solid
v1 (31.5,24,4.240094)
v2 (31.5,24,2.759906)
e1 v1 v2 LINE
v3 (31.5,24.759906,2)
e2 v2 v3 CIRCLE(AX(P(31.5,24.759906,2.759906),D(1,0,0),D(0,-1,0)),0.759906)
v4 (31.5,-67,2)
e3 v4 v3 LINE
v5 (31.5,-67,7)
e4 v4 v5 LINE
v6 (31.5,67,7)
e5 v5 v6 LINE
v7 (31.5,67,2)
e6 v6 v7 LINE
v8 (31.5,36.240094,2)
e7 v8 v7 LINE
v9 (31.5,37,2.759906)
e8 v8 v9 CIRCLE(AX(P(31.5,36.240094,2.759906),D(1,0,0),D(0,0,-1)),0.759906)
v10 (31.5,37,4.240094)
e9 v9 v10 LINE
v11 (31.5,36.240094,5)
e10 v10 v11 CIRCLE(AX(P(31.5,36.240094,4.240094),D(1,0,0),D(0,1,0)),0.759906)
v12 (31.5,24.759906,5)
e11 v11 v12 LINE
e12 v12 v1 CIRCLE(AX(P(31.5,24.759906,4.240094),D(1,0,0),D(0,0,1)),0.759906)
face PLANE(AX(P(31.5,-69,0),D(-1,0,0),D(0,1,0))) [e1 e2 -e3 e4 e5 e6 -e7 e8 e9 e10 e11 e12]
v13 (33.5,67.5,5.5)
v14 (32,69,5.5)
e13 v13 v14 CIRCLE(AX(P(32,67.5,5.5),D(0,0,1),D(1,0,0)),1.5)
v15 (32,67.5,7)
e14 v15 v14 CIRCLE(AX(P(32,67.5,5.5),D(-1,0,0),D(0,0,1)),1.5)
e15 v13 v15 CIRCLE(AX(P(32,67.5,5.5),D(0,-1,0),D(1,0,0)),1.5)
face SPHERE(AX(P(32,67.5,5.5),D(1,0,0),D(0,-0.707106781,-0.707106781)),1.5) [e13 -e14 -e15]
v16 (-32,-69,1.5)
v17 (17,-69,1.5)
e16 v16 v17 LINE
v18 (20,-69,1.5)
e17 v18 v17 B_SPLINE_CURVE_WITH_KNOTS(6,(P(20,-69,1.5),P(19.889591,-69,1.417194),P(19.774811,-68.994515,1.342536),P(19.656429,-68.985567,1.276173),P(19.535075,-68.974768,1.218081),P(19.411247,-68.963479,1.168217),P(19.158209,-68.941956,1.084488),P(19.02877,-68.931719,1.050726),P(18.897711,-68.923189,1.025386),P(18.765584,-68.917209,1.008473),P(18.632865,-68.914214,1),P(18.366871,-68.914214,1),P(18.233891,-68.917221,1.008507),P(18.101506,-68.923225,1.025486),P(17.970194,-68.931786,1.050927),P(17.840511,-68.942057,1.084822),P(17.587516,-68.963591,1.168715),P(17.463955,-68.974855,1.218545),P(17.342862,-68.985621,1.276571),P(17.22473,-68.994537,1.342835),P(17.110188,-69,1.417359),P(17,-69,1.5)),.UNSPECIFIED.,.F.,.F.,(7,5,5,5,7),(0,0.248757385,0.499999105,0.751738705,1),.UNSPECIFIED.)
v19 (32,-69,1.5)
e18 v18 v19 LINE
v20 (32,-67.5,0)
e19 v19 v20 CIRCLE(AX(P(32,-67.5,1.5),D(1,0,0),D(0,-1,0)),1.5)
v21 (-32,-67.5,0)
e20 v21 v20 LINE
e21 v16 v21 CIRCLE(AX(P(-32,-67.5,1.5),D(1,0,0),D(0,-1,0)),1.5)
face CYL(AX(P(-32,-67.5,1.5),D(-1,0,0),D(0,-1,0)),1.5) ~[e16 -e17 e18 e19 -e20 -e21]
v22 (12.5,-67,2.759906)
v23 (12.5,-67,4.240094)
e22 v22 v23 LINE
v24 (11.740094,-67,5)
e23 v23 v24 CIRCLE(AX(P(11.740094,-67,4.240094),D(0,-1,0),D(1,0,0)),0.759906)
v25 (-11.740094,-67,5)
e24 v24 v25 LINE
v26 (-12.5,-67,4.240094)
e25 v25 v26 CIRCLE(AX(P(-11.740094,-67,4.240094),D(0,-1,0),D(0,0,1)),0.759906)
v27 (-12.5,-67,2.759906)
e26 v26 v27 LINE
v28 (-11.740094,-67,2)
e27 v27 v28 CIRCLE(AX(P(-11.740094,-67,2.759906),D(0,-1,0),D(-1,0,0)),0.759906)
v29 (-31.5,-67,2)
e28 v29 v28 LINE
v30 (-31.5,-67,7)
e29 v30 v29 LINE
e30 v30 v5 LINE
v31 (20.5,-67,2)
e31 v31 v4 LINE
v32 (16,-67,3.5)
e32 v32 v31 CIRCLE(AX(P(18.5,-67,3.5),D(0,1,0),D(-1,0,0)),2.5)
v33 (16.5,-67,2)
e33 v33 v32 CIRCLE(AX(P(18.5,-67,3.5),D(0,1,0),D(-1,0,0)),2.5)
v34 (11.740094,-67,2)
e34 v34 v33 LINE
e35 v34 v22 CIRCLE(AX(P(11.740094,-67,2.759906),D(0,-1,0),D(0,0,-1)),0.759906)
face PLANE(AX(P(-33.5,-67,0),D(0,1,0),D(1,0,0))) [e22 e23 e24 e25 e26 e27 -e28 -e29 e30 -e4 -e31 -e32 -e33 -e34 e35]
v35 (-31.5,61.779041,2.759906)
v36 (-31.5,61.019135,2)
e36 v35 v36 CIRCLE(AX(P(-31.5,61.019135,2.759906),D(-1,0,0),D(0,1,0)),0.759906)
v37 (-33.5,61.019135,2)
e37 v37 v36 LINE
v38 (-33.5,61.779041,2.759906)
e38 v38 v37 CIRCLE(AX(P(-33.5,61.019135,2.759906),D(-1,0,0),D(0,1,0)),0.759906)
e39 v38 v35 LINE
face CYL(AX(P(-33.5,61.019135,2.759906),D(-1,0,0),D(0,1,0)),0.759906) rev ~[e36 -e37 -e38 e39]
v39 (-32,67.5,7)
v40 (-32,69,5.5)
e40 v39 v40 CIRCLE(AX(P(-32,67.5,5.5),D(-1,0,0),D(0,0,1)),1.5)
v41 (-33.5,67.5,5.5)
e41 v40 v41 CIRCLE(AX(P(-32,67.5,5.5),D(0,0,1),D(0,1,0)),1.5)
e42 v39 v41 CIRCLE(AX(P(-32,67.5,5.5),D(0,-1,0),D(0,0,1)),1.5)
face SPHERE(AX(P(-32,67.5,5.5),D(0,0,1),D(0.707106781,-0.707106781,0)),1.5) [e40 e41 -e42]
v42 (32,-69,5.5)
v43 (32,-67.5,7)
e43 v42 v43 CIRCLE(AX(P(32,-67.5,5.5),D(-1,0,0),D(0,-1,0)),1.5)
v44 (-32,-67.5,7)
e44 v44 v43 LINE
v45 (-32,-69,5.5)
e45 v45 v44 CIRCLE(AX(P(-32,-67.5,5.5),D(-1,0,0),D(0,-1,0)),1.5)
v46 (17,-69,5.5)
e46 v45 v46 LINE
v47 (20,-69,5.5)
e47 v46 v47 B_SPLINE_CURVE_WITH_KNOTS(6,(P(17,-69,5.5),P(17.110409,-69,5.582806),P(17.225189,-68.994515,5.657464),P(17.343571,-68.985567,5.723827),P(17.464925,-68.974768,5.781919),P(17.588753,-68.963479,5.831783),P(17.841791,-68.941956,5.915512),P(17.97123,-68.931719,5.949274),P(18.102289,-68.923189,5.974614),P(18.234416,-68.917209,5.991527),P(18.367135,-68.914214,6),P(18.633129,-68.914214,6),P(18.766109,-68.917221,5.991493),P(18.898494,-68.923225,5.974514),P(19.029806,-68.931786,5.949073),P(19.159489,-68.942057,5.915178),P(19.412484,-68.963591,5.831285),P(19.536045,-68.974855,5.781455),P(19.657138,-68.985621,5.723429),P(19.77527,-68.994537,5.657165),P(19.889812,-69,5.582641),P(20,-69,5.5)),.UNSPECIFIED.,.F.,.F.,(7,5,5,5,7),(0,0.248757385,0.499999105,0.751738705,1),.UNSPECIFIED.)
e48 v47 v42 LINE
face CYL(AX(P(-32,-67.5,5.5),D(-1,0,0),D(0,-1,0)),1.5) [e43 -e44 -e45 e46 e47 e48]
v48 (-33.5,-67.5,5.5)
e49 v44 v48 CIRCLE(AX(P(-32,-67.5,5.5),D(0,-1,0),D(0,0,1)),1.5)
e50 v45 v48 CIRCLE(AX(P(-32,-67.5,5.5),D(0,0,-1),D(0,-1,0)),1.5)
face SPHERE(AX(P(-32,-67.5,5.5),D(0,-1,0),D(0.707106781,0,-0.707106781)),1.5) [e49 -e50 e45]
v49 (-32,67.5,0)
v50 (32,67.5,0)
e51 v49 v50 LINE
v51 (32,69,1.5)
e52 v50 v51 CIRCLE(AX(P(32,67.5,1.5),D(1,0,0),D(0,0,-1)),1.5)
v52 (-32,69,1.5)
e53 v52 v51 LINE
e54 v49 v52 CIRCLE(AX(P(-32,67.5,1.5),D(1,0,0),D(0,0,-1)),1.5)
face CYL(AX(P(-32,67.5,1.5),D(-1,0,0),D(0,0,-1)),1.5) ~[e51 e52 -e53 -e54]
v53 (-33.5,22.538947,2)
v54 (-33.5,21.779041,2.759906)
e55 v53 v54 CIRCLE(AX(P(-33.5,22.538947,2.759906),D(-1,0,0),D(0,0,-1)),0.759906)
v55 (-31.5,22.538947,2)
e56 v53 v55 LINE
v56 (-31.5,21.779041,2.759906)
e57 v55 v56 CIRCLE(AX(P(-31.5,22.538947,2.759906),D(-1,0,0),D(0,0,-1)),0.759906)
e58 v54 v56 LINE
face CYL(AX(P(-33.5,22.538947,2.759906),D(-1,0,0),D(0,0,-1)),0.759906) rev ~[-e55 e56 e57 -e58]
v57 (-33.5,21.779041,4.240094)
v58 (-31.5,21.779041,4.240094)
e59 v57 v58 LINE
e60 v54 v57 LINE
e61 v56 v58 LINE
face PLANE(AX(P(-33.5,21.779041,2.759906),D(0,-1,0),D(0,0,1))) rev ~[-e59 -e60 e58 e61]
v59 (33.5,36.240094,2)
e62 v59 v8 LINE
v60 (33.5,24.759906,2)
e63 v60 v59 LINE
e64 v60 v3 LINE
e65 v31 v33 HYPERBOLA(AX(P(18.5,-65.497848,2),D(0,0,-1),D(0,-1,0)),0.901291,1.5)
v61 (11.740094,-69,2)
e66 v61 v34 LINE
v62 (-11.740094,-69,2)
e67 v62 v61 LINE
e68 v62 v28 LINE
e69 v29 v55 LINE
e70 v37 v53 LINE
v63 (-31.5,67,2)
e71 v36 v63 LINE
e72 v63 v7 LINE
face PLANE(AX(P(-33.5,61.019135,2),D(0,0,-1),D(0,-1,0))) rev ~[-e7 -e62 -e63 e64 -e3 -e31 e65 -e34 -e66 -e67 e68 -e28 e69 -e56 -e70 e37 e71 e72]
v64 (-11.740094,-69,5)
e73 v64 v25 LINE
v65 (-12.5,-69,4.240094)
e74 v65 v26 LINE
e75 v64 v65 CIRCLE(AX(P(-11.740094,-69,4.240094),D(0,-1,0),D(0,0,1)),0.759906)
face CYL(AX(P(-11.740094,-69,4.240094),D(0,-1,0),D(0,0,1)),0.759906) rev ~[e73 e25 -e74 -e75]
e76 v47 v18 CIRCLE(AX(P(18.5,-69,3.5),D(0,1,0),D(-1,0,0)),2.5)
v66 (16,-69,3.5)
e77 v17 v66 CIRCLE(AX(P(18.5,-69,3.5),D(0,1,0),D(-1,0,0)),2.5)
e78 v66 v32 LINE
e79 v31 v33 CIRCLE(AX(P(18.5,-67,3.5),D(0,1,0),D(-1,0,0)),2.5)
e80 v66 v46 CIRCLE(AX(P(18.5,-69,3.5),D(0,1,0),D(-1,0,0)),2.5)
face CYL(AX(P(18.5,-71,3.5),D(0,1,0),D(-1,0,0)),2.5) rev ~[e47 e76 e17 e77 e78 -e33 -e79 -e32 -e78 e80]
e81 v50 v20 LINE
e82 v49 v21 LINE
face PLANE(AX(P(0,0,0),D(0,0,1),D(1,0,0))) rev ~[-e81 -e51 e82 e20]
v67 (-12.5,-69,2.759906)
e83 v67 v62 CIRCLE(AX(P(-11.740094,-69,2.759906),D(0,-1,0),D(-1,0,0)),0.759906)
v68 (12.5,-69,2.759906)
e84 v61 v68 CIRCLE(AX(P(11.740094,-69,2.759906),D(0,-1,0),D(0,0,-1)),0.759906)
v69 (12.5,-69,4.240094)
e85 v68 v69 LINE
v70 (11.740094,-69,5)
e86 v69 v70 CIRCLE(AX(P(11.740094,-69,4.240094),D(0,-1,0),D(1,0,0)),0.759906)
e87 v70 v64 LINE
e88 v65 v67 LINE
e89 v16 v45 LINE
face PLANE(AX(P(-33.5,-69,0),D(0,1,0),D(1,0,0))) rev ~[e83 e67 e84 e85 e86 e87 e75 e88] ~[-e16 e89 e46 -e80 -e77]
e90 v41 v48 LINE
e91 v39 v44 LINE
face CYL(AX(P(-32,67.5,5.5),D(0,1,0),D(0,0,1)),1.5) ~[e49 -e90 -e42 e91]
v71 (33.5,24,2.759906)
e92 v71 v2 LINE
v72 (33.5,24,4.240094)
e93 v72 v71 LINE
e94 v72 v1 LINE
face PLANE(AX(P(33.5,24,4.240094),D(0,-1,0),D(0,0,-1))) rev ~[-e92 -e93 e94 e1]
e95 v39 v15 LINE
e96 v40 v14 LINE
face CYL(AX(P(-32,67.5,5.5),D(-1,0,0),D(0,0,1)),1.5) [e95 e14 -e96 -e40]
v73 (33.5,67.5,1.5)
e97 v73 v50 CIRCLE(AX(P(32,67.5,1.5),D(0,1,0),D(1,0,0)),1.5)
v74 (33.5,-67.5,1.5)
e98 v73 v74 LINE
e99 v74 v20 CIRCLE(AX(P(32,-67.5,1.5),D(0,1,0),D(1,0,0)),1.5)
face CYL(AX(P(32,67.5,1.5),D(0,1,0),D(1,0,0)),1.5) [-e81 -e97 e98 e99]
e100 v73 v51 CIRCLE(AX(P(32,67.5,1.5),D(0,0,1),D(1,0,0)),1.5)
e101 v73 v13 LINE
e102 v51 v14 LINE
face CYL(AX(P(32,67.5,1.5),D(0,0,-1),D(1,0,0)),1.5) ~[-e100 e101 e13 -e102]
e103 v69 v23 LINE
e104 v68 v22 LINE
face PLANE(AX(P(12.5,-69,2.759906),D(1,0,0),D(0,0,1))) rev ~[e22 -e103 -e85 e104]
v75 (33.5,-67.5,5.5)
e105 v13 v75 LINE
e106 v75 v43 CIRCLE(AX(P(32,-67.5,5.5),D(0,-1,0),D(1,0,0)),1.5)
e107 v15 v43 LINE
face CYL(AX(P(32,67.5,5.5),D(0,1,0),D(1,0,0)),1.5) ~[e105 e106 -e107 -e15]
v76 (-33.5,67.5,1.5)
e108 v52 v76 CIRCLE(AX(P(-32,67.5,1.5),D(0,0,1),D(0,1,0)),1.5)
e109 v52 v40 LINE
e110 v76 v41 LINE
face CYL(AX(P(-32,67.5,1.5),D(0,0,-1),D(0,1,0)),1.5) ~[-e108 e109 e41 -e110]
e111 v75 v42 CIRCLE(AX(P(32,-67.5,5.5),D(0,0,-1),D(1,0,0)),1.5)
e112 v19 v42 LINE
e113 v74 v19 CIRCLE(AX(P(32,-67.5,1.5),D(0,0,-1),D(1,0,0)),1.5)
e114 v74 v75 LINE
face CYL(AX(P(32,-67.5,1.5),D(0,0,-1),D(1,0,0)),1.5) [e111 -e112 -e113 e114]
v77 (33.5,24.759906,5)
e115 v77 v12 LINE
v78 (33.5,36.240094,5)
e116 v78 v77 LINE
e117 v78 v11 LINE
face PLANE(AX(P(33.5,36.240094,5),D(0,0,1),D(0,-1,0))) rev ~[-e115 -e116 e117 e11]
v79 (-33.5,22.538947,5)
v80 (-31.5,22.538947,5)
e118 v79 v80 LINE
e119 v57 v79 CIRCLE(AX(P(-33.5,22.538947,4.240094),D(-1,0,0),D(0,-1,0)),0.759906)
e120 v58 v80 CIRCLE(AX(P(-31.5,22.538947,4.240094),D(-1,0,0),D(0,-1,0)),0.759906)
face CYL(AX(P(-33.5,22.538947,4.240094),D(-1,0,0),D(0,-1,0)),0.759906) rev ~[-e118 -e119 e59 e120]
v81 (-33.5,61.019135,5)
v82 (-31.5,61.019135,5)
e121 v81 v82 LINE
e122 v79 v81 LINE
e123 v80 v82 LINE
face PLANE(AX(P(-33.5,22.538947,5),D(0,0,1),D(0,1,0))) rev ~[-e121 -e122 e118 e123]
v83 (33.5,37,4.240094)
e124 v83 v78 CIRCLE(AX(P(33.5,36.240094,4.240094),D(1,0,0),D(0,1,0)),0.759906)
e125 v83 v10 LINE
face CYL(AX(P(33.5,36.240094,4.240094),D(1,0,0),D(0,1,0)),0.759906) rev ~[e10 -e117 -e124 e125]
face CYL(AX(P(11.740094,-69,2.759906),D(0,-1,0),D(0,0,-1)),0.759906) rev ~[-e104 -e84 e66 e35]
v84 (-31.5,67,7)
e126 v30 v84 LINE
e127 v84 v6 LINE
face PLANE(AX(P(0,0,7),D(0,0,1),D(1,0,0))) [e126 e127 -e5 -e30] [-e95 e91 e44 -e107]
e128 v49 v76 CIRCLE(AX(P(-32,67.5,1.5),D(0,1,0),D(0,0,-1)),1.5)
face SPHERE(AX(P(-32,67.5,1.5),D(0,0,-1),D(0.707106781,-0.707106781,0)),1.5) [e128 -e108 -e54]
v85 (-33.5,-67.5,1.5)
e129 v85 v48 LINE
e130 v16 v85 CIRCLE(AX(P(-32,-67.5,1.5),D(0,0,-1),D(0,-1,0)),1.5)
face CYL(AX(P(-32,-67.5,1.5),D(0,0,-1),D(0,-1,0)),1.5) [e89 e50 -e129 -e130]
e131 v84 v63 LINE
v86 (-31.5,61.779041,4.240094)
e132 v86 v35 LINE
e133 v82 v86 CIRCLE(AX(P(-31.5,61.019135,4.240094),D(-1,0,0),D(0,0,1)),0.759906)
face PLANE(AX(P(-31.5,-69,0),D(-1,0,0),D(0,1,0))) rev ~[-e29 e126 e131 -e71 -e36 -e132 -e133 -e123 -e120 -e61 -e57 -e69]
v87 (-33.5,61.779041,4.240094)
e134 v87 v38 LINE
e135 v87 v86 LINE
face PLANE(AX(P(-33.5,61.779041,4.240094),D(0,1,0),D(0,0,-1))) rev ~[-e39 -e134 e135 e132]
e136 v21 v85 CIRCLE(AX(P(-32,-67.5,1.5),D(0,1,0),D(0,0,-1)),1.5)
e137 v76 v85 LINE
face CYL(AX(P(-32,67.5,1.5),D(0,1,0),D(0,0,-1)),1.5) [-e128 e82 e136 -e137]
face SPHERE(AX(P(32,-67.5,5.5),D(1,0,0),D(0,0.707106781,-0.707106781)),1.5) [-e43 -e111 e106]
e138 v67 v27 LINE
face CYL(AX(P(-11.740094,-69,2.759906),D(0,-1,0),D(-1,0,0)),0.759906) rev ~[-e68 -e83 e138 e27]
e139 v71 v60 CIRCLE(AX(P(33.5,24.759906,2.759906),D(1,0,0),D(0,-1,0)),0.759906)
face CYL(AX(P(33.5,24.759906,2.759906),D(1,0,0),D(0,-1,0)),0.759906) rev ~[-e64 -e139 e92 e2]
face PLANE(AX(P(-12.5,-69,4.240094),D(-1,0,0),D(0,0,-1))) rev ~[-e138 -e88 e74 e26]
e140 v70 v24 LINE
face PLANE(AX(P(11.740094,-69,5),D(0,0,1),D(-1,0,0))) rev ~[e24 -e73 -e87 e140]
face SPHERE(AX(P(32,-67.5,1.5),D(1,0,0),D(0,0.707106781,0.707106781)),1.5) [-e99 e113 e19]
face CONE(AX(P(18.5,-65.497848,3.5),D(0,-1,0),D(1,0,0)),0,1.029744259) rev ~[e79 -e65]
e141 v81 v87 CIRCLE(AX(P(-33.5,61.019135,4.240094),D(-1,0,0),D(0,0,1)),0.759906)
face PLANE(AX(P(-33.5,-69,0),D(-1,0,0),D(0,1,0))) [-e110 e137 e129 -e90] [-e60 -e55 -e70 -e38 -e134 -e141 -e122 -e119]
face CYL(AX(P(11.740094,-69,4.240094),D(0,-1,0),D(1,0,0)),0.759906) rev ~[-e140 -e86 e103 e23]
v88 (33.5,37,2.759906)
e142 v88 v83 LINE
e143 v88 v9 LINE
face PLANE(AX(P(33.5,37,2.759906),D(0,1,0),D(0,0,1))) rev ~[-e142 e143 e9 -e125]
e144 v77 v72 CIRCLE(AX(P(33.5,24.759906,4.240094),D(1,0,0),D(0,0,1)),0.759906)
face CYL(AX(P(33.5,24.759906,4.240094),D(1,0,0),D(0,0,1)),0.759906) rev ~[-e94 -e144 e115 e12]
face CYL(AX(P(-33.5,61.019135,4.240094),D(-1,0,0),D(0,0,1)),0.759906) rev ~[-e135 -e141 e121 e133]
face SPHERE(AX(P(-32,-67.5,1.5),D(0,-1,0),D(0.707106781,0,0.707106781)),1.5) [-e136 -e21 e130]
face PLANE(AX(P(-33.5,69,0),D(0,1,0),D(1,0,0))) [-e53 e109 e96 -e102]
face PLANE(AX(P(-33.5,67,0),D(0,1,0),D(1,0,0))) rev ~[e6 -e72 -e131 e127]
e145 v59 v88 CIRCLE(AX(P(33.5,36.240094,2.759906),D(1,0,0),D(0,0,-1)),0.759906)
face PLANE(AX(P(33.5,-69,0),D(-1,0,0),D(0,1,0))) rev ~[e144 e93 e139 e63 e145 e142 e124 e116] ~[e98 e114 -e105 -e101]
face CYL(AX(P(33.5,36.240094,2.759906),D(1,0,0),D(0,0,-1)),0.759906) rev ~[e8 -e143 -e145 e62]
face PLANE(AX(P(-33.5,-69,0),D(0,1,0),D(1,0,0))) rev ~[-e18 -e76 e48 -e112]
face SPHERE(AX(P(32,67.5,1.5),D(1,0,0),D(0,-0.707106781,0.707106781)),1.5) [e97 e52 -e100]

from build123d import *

# Parameters (mm, degrees)
F0_W          = 67
F0_H          = 138
F1_DEPTH      = 7
F2_T          = -2
F4_DEPTH      = 2
F6_DEPTH      = 2
F8_DEPTH      = 2
F10_D         = 5
F10_DEPTH     = 2
F10_TIP       = 1.5021515476
F11_T1_DEPTH  = 135
F11_T3_DEPTH  = 64
F11_T5_DEPTH  = 4
F11_S9_W      = 1.5
F11_S9_H      = 1.5
F11_T10_DEPTH = 1.5
F11_S15_W     = 1.5
F11_S15_H     = 1.5
F11_T16_DEPTH = 1.5
F11_S21_W     = 1.5
F11_S21_H     = 1.5
F11_T22_DEPTH = 1.5
F11_S27_W     = 1.5
F11_S27_H     = 1.5
F11_T28_DEPTH = 1.5
F11_S33_W     = 1.5
F11_S33_H     = 1.5
F11_T34_DEPTH = 1.5
F11_S39_W     = 1.5
F11_S39_H     = 1.5
F11_T40_DEPTH = 1.5
F11_S45_W     = 1.5
F11_S45_H     = 1.5
F11_T46_DEPTH = 1.5
F11_S51_W     = 1.5
F11_S51_H     = 1.5
F11_T52_DEPTH = 1.5


# Not quite as in the source:
# - a fillet or chamfer that OpenCascade refuses, or shapes differently, is made with other operations: its cross-section is extruded or revolved along the edge and cut away or added


with BuildPart() as f1:
    # F0 (on Top) → F1 (new body)
    with BuildSketch(Plane.XY):
        Rectangle(F0_W, F0_H)
    extrude(amount=F1_DEPTH)

    # F2
    f2_openings = [f1.faces().sort_by_distance(p)[0] for p in [
        (0, 0, 7),
    ]]
    offset(amount=F2_T, openings=f2_openings)

    # F3 (on face) → F4 (cut, through all)
    with BuildSketch(Plane(origin=(-33.5, 0, 0), x_dir=(0, -1, 0), z_dir=(-1, 0, 0))):
        with BuildLine():
            Line((-22.538946541, 5), (-61.0191351455, 5))
            ThreePointArc((-61.0191351455, 5), (-61.5564696174, 4.7774287742), (-61.7790408432, 4.2400943022))
            Line((-61.7790408432, 4.2400943022), (-61.7790408432, 2.7599056978))
            ThreePointArc((-61.7790408432, 2.7599056978), (-61.5564696174, 2.2225712258), (-61.0191351455, 2))
            Line((-61.0191351455, 2), (-22.538946541, 2))
            ThreePointArc((-22.538946541, 2), (-22.0016120691, 2.2225712258), (-21.7790408432, 2.7599056978))
            Line((-21.7790408432, 2.7599056978), (-21.7790408432, 4.2400943022))
            ThreePointArc((-21.7790408432, 4.2400943022), (-22.0016120691, 4.7774287742), (-22.538946541, 5))
        make_face()
    extrude(amount=-F4_DEPTH, mode=Mode.SUBTRACT)

    # F5 (on face) → F6 (cut, through all)
    with BuildSketch(Plane.YZ.offset(33.5)):
        with BuildLine():
            Line((36.2400943022, 5), (24.7599056978, 5))
            ThreePointArc((24.7599056978, 5), (24.2225712258, 4.7774287742), (24, 4.2400943022))
            Line((24, 4.2400943022), (24, 2.7599056978))
            ThreePointArc((24, 2.7599056978), (24.2225712258, 2.2225712258), (24.7599056978, 2))
            Line((24.7599056978, 2), (36.2400943022, 2))
            ThreePointArc((36.2400943022, 2), (36.7774287742, 2.2225712258), (37, 2.7599056978))
            Line((37, 2.7599056978), (37, 4.2400943022))
            ThreePointArc((37, 4.2400943022), (36.7774287742, 4.7774287742), (36.2400943022, 5))
        make_face()
    extrude(amount=-F6_DEPTH, mode=Mode.SUBTRACT)

    # F7 (on face) → F8 (cut, through all)
    with BuildSketch(Plane.XZ.offset(69)):
        with BuildLine():
            Line((11.7400943022, 5), (-11.7400943022, 5))
            ThreePointArc((-11.7400943022, 5), (-12.2774287742, 4.7774287742), (-12.5, 4.2400943022))
            Line((-12.5, 4.2400943022), (-12.5, 2.7599056978))
            ThreePointArc((-12.5, 2.7599056978), (-12.2774287742, 2.2225712258), (-11.7400943022, 2))
            Line((-11.7400943022, 2), (11.7400943022, 2))
            ThreePointArc((11.7400943022, 2), (12.2774287742, 2.2225712258), (12.5, 2.7599056978))
            Line((12.5, 2.7599056978), (12.5, 4.2400943022))
            ThreePointArc((12.5, 4.2400943022), (12.2774287742, 4.7774287742), (11.7400943022, 5))
        make_face()
    extrude(amount=-F8_DEPTH, mode=Mode.SUBTRACT)

    # F10
    with Locations(Plane.XZ.offset(69)):
        with Locations((18.5, 3.5)):
            Hole(F10_D / 2, depth=F10_DEPTH)
            with Locations((0, 0, -(F10_DEPTH + F10_TIP / 2))):  # 118° drill point
                Cone(0, F10_D / 2, F10_TIP, mode=Mode.SUBTRACT)

    # F11: fillet of radius 1.5 on 12 edges, made by hand

    # F11_s2 → F11_t1 (cut)
    with BuildSketch(Plane.XZ.offset(-67.5)):
        with BuildLine():
            ThreePointArc((33.5, 5.5), (33.0606601718, 6.5606601718), (32, 7))
            Line((32, 7), (33.5, 7))
            Line((33.5, 7), (33.5, 5.5))
        make_face()
        with BuildLine():
            ThreePointArc((33.5, 1.5), (33.0606601718, 0.4393398282), (32, 0))
            Line((32, 0), (33.5, 0))
            Line((33.5, 0), (33.5, 1.5))
        make_face()
        with BuildLine():
            ThreePointArc((-32, 7), (-33.0606601718, 6.5606601718), (-33.5, 5.5))
            Line((-33.5, 5.5), (-33.5, 7))
            Line((-33.5, 7), (-32, 7))
        make_face()
        with BuildLine():
            ThreePointArc((-32, 0), (-33.0606601718, 0.4393398282), (-33.5, 1.5))
            Line((-33.5, 1.5), (-33.5, 0))
            Line((-33.5, 0), (-32, 0))
        make_face()
    extrude(amount=F11_T1_DEPTH, mode=Mode.SUBTRACT)

    # F11_s4 → F11_t3 (cut)
    with BuildSketch(Plane.YZ.offset(-32)):
        with BuildLine():
            ThreePointArc((-69, 5.5), (-68.5606601718, 6.5606601718), (-67.5, 7))
            Line((-67.5, 7), (-69, 7))
            Line((-69, 7), (-69, 5.5))
        make_face()
        with BuildLine():
            ThreePointArc((-69, 1.5), (-68.5606601718, 0.4393398282), (-67.5, 0))
            Line((-67.5, 0), (-69, 0))
            Line((-69, 0), (-69, 1.5))
        make_face()
        with BuildLine():
            ThreePointArc((67.5, 7), (68.5606601718, 6.5606601718), (69, 5.5))
            Line((69, 5.5), (69, 7))
            Line((69, 7), (67.5, 7))
        make_face()
        with BuildLine():
            ThreePointArc((67.5, 0), (68.5606601718, 0.4393398282), (69, 1.5))
            Line((69, 1.5), (69, 0))
            Line((69, 0), (67.5, 0))
        make_face()
    extrude(amount=F11_T3_DEPTH, mode=Mode.SUBTRACT)

    # F11_s6 → F11_t5 (cut)
    with BuildSketch(Plane.XY.offset(1.5)):
        with BuildLine():
            ThreePointArc((33.5, -67.5), (33.0606601718, -68.5606601718), (32, -69))
            Line((32, -69), (33.5, -69))
            Line((33.5, -69), (33.5, -67.5))
        make_face()
        with BuildLine():
            ThreePointArc((33.5, 67.5), (33.0606601718, 68.5606601718), (32, 69))
            Line((32, 69), (33.5, 69))
            Line((33.5, 69), (33.5, 67.5))
        make_face()
        with BuildLine():
            ThreePointArc((-32, 69), (-33.0606601718, 68.5606601718), (-33.5, 67.5))
            Line((-33.5, 67.5), (-33.5, 69))
            Line((-33.5, 69), (-32, 69))
        make_face()
        with BuildLine():
            ThreePointArc((-32, -69), (-33.0606601718, -68.5606601718), (-33.5, -67.5))
            Line((-33.5, -67.5), (-33.5, -69))
            Line((-33.5, -69), (-32, -69))
        make_face()
    extrude(amount=F11_T5_DEPTH, mode=Mode.SUBTRACT)


with BuildPart() as f11_tool8:
    # F11_s9 → F11_t10 (new body)
    with BuildSketch(Plane.YZ.offset(32)):
        with Locations((-68.25, 6.25)):
            Rectangle(F11_S9_W, F11_S9_H)
    extrude(amount=F11_T10_DEPTH)

    # F11_s11 → F11_t12 (revolve, cut)
    with BuildSketch(Plane(origin=(32, -67.5, 5.5), x_dir=(0, 0.7071067812, -0.7071067812), z_dir=(0, -0.7071067812, -0.7071067812))):
        with BuildLine():
            ThreePointArc((0, -1.5), (1.5, 0), (0, 1.5))
            Line((0, 1.5), (0, -1.5))
        make_face()
    revolve(axis=Axis((32, -67.5, 5.5), (1, 0, 0)), mode=Mode.SUBTRACT)


with BuildPart() as f1_1:
    add(f1.part)

    # F11_t7: cut F11_tool8
    add(f11_tool8.part, mode=Mode.SUBTRACT)


with BuildPart() as f11_tool14:
    # F11_s15 → F11_t16 (new body)
    with BuildSketch(Plane.YZ.offset(32)):
        with Locations((68.25, 6.25)):
            Rectangle(F11_S15_W, F11_S15_H)
    extrude(amount=F11_T16_DEPTH)

    # F11_s17 → F11_t18 (revolve, cut)
    with BuildSketch(Plane(origin=(32, 67.5, 5.5), x_dir=(0, -0.7071067812, -0.7071067812), z_dir=(0, -0.7071067812, 0.7071067812))):
        with BuildLine():
            ThreePointArc((0, -1.5), (1.5, 0), (0, 1.5))
            Line((0, 1.5), (0, -1.5))
        make_face()
    revolve(axis=Axis((32, 67.5, 5.5), (1, 0, 0)), mode=Mode.SUBTRACT)


with BuildPart() as f1_2:
    add(f1_1.part)

    # F11_t13: cut F11_tool14
    add(f11_tool14.part, mode=Mode.SUBTRACT)


with BuildPart() as f11_tool20:
    # F11_s21 → F11_t22 (new body)
    with BuildSketch(Plane.XZ.offset(67.5)):
        with Locations((-32.75, 6.25)):
            Rectangle(F11_S21_W, F11_S21_H)
    extrude(amount=F11_T22_DEPTH)

    # F11_s23 → F11_t24 (revolve, cut)
    with BuildSketch(Plane(origin=(-32, -67.5, 5.5), x_dir=(0.7071067812, 0, -0.7071067812), z_dir=(-0.7071067812, 0, -0.7071067812))):
        with BuildLine():
            ThreePointArc((0, -1.5), (1.5, 0), (0, 1.5))
            Line((0, 1.5), (0, -1.5))
        make_face()
    revolve(axis=Axis((-32, -67.5, 5.5), (0, -1, 0)), mode=Mode.SUBTRACT)


with BuildPart() as f1_3:
    add(f1_2.part)

    # F11_t19: cut F11_tool20
    add(f11_tool20.part, mode=Mode.SUBTRACT)


with BuildPart() as f11_tool26:
    # F11_s27 → F11_t28 (new body)
    with BuildSketch(Plane.XZ.offset(67.5)):
        with Locations((-32.75, 0.75)):
            Rectangle(F11_S27_W, F11_S27_H)
    extrude(amount=F11_T28_DEPTH)

    # F11_s29 → F11_t30 (revolve, cut)
    with BuildSketch(Plane(origin=(-32, -67.5, 1.5), x_dir=(0.7071067812, 0, 0.7071067812), z_dir=(0.7071067812, 0, -0.7071067812))):
        with BuildLine():
            ThreePointArc((0, -1.5), (1.5, 0), (0, 1.5))
            Line((0, 1.5), (0, -1.5))
        make_face()
    revolve(axis=Axis((-32, -67.5, 1.5), (0, -1, 0)), mode=Mode.SUBTRACT)


with BuildPart() as f1_4:
    add(f1_3.part)

    # F11_t25: cut F11_tool26
    add(f11_tool26.part, mode=Mode.SUBTRACT)


with BuildPart() as f11_tool32:
    # F11_s33 → F11_t34 (new body)
    with BuildSketch(Plane.YZ.offset(32)):
        with Locations((-68.25, 0.75)):
            Rectangle(F11_S33_W, F11_S33_H)
    extrude(amount=F11_T34_DEPTH)

    # F11_s35 → F11_t36 (revolve, cut)
    with BuildSketch(Plane(origin=(32, -67.5, 1.5), x_dir=(0, 0.7071067812, 0.7071067812), z_dir=(0, 0.7071067812, -0.7071067812))):
        with BuildLine():
            ThreePointArc((0, -1.5), (1.5, 0), (0, 1.5))
            Line((0, 1.5), (0, -1.5))
        make_face()
    revolve(axis=Axis((32, -67.5, 1.5), (1, 0, 0)), mode=Mode.SUBTRACT)


with BuildPart() as f1_5:
    add(f1_4.part)

    # F11_t31: cut F11_tool32
    add(f11_tool32.part, mode=Mode.SUBTRACT)


with BuildPart() as f11_tool38:
    # F11_s39 → F11_t40 (new body)
    with BuildSketch(Plane.YZ.offset(32)):
        with Locations((68.25, 0.75)):
            Rectangle(F11_S39_W, F11_S39_H)
    extrude(amount=F11_T40_DEPTH)

    # F11_s41 → F11_t42 (revolve, cut)
    with BuildSketch(Plane(origin=(32, 67.5, 1.5), x_dir=(0, -0.7071067812, 0.7071067812), z_dir=(0, 0.7071067812, 0.7071067812))):
        with BuildLine():
            ThreePointArc((0, -1.5), (1.5, 0), (0, 1.5))
            Line((0, 1.5), (0, -1.5))
        make_face()
    revolve(axis=Axis((32, 67.5, 1.5), (1, 0, 0)), mode=Mode.SUBTRACT)


with BuildPart() as f1_6:
    add(f1_5.part)

    # F11_t37: cut F11_tool38
    add(f11_tool38.part, mode=Mode.SUBTRACT)


with BuildPart() as f11_tool44:
    # F11_s45 → F11_t46 (new body)
    with BuildSketch(Plane.XY.offset(5.5)):
        with Locations((-32.75, 68.25)):
            Rectangle(F11_S45_W, F11_S45_H)
    extrude(amount=F11_T46_DEPTH)

    # F11_s47 → F11_t48 (revolve, cut)
    with BuildSketch(Plane(origin=(-32, 67.5, 5.5), x_dir=(0.7071067812, -0.7071067812, 0), z_dir=(-0.7071067812, -0.7071067812, 0))):
        with BuildLine():
            ThreePointArc((0, -1.5), (1.5, 0), (0, 1.5))
            Line((0, 1.5), (0, -1.5))
        make_face()
    revolve(axis=Axis((-32, 67.5, 5.5), (0, 0, 1)), mode=Mode.SUBTRACT)


with BuildPart() as f1_7:
    add(f1_6.part)

    # F11_t43: cut F11_tool44
    add(f11_tool44.part, mode=Mode.SUBTRACT)


with BuildPart() as f11_tool50:
    # F11_s51 → F11_t52 (new body)
    with BuildSketch(Plane.XY.offset(1.5)):
        with Locations((-32.75, 68.25)):
            Rectangle(F11_S51_W, F11_S51_H)
    extrude(amount=-F11_T52_DEPTH)

    # F11_s53 → F11_t54 (revolve, cut)
    with BuildSketch(Plane(origin=(-32, 67.5, 1.5), x_dir=(0.7071067812, -0.7071067812, 0), z_dir=(0.7071067812, 0.7071067812, 0))):
        with BuildLine():
            ThreePointArc((0, -1.5), (1.5, 0), (0, 1.5))
            Line((0, 1.5), (0, -1.5))
        make_face()
    revolve(axis=Axis((-32, 67.5, 1.5), (0, 0, -1)), mode=Mode.SUBTRACT)


with BuildPart() as f1_8:
    add(f1_7.part)

    # F11_t49: cut F11_tool50
    add(f11_tool50.part, mode=Mode.SUBTRACT)


solid = f1_8.part
